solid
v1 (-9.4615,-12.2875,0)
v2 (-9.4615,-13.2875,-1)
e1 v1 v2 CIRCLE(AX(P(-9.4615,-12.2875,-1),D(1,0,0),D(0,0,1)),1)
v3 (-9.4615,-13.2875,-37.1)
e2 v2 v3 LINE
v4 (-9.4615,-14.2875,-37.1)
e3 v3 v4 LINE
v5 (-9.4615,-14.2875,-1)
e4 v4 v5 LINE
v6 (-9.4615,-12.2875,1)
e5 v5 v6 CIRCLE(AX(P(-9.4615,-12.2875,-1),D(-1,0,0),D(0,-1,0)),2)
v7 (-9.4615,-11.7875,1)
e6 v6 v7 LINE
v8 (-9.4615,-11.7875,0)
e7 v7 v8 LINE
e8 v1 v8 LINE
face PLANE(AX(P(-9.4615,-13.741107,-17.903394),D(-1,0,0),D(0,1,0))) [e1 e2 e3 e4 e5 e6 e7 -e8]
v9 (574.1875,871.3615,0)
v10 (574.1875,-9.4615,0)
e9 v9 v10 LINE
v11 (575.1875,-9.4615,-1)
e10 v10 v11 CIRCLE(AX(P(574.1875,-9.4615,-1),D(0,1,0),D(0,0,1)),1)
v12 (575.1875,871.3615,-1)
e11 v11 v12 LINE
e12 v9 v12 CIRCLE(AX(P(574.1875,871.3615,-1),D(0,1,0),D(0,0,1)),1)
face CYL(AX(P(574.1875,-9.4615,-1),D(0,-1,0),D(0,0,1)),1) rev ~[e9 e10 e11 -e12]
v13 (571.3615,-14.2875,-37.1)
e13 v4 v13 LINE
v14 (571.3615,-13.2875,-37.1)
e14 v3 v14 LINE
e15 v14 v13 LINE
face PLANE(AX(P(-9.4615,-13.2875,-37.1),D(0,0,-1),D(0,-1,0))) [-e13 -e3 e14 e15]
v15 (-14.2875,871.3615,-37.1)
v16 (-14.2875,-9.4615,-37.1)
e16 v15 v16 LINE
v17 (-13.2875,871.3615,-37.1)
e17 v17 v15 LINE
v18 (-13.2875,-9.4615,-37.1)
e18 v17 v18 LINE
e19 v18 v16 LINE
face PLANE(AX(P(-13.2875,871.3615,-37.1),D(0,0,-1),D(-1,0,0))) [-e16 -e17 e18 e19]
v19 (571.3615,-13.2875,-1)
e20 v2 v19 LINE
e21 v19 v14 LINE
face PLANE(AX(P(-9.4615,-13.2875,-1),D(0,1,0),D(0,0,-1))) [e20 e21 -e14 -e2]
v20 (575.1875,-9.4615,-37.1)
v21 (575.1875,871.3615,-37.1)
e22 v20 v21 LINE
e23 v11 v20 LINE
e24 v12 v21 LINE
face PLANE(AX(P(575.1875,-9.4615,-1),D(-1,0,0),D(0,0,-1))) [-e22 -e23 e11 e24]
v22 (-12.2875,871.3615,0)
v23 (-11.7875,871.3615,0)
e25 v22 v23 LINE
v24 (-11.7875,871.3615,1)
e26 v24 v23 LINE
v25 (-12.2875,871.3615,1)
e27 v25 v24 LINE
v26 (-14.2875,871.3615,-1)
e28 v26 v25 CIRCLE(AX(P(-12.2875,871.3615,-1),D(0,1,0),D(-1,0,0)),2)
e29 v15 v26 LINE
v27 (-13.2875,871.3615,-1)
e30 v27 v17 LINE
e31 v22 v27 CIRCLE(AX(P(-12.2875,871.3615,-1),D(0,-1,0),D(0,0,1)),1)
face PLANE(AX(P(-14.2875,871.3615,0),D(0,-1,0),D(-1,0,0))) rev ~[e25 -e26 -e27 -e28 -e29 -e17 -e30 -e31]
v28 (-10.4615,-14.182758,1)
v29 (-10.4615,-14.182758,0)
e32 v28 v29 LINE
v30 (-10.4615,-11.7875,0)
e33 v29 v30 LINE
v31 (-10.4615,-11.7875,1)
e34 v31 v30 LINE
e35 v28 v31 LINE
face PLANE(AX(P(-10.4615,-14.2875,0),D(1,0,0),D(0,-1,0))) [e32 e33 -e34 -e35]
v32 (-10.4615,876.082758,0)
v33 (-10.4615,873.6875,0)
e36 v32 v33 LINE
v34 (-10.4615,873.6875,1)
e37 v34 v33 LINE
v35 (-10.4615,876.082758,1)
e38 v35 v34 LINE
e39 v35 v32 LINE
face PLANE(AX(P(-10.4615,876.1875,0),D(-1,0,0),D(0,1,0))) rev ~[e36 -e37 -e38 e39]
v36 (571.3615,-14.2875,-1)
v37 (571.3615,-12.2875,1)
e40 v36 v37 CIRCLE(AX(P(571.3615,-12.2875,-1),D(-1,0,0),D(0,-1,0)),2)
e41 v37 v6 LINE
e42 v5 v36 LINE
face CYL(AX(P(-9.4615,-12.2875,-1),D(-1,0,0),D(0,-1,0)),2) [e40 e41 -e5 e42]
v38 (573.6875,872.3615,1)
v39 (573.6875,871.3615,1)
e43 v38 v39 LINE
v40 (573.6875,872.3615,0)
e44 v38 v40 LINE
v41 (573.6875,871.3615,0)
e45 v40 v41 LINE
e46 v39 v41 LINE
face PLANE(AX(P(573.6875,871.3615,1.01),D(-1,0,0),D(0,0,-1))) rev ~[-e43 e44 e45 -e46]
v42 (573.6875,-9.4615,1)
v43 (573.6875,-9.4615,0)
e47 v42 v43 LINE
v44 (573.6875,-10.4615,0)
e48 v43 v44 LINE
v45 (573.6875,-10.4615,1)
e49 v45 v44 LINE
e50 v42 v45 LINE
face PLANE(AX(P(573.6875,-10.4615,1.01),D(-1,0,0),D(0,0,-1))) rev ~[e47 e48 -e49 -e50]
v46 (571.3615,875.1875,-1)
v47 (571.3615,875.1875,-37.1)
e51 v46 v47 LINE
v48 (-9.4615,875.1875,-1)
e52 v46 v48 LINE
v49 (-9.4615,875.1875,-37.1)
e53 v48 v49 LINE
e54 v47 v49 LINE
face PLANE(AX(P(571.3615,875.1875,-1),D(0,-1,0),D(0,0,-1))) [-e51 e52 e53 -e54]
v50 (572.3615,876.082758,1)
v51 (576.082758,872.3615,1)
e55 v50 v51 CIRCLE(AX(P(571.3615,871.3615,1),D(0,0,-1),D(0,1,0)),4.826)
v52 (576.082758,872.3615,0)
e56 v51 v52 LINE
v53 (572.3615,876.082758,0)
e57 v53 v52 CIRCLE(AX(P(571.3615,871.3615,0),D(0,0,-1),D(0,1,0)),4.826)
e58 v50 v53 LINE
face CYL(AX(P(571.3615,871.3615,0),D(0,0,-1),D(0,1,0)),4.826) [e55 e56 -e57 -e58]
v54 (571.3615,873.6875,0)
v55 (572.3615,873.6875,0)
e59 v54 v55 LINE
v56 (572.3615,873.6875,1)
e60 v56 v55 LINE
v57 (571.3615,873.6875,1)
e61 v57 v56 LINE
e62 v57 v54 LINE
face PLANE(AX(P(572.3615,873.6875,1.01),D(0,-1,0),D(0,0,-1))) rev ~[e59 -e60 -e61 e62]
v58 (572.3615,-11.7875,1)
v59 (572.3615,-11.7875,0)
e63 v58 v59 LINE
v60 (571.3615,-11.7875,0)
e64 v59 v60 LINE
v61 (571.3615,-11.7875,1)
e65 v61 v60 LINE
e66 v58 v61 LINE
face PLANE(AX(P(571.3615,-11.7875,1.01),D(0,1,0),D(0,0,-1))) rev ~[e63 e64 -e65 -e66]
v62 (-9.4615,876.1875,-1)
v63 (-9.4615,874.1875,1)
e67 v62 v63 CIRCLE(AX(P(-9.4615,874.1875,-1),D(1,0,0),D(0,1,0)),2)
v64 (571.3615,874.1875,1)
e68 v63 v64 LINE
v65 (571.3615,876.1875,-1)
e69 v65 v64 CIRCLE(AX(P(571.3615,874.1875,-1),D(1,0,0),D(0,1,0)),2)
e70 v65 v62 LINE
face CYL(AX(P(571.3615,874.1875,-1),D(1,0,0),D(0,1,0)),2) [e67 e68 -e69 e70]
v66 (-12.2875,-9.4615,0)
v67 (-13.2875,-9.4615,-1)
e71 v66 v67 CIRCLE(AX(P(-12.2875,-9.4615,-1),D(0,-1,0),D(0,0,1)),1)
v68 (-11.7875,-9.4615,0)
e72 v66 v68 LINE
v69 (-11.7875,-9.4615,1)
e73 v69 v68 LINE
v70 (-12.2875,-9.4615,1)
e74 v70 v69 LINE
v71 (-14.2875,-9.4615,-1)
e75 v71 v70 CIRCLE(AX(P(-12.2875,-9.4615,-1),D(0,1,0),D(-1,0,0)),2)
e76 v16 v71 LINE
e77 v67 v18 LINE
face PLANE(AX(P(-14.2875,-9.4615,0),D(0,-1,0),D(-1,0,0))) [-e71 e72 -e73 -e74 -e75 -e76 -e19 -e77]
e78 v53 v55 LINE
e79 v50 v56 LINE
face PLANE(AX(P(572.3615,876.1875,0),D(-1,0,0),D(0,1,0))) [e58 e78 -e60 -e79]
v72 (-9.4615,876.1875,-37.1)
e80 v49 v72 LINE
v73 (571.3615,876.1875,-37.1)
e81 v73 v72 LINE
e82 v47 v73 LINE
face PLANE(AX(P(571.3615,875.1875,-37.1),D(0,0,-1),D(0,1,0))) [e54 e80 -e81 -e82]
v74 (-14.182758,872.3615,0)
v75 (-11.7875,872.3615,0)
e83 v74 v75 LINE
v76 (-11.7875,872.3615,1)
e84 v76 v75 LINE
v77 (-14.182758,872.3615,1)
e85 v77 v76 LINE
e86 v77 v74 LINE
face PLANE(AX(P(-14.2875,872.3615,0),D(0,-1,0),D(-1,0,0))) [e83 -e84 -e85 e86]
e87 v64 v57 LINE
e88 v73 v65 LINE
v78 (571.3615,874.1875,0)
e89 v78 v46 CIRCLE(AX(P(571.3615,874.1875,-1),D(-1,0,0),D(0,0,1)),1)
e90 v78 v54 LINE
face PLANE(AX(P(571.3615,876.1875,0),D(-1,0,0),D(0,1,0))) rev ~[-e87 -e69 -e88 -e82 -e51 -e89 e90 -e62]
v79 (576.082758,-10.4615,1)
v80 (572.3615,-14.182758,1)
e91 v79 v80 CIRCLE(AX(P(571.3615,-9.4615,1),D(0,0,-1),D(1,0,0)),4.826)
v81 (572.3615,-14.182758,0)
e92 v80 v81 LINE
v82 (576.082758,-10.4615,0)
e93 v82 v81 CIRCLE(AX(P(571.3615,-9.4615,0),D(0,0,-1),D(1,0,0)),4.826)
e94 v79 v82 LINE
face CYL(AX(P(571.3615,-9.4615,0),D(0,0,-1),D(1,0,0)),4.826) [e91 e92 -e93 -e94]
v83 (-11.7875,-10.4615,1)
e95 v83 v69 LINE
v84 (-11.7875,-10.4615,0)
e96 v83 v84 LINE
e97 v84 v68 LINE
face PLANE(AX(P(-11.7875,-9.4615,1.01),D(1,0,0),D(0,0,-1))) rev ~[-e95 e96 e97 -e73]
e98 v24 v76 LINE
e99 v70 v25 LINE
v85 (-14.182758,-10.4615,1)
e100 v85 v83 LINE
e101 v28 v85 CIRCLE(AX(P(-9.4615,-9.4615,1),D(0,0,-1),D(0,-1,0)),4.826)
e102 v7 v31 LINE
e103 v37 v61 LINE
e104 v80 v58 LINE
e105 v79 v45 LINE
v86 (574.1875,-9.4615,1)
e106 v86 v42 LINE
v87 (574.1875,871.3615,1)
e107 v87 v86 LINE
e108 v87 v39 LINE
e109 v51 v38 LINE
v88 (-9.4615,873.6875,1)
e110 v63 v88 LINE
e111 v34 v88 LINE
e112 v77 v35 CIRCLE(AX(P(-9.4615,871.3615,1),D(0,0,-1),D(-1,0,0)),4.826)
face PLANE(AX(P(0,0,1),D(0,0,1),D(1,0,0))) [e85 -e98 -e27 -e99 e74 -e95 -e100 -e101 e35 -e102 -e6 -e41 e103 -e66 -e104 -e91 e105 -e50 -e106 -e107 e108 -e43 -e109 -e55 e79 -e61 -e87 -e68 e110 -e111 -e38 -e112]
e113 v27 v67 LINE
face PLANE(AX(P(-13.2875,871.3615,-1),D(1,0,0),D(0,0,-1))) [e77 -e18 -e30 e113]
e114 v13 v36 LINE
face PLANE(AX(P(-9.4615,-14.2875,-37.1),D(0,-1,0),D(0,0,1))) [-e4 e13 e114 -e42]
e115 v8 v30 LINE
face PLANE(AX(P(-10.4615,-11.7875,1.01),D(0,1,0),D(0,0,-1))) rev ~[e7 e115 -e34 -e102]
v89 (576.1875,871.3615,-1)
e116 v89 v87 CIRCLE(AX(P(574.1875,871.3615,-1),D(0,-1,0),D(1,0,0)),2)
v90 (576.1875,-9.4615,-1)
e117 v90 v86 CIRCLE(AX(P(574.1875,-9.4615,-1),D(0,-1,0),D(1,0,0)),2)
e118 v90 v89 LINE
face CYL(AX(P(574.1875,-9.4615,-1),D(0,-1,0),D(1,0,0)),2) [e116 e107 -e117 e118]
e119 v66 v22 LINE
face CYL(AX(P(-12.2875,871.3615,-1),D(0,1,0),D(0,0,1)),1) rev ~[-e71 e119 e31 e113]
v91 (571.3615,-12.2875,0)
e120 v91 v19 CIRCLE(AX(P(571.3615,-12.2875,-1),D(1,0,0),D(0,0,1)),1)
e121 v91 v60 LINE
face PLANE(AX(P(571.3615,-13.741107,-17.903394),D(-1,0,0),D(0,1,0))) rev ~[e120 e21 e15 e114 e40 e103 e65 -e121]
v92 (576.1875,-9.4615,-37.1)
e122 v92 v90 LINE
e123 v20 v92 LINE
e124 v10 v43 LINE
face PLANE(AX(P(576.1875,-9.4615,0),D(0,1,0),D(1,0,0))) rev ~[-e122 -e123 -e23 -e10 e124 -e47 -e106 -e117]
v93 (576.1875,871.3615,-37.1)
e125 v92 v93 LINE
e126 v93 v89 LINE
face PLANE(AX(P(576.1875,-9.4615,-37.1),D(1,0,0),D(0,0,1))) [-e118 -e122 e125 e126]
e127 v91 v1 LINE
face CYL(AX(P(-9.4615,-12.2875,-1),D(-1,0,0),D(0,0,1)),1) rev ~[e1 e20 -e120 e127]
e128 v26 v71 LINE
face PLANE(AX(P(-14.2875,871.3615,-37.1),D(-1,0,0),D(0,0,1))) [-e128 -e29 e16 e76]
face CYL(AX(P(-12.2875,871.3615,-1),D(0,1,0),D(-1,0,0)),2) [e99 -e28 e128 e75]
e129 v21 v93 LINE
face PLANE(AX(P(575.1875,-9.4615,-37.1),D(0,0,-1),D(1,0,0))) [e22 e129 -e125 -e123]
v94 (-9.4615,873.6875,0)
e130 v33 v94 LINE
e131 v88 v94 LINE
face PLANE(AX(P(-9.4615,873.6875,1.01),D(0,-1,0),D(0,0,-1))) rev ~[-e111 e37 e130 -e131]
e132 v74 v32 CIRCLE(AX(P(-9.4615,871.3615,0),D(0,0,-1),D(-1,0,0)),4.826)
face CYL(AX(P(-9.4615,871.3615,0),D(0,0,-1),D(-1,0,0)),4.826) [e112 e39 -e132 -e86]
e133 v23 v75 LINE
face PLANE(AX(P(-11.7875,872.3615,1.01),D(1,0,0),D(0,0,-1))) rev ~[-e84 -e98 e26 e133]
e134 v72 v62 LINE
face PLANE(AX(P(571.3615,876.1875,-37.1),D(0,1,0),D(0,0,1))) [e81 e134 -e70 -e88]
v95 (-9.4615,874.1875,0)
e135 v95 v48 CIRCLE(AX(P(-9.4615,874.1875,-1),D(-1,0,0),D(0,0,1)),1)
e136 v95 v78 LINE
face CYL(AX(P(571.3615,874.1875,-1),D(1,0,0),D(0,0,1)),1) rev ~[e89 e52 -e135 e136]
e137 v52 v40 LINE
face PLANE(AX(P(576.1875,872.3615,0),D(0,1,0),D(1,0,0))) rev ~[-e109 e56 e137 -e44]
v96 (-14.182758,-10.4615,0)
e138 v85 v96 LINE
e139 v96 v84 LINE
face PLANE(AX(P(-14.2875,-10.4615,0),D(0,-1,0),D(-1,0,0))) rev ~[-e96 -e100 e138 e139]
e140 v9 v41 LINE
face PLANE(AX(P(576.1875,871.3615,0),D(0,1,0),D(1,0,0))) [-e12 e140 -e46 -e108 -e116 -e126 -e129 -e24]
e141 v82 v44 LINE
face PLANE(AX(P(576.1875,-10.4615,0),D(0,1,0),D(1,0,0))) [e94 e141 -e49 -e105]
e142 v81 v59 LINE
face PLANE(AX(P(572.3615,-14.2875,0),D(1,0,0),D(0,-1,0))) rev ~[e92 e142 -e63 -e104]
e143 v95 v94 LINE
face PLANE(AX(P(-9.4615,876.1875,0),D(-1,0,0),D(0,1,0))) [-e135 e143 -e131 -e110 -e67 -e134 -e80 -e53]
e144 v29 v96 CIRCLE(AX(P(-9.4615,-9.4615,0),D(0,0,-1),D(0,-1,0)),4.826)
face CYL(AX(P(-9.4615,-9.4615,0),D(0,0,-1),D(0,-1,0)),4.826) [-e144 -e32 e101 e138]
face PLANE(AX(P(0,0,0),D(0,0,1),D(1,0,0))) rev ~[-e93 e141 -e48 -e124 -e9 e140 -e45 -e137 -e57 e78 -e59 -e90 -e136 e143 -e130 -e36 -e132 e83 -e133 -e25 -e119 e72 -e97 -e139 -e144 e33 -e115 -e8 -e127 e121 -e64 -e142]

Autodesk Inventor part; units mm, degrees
ref_plane "YZ Plane" through (0, 0, 0) normal (1, 0, 0) x (0, 1, 0)
ref_plane "XZ Plane" through (0, 0, 0) normal (0, 1, 0) x (-1, 0, 0)
ref_plane "XY Plane" through (0, 0, 0) normal (0, 0, 1) x (1, 0, 0)
sketch "Boceto1" plane through (0, 0, 0) normal (0, 0, 1) x (1, 0, 0)
  line L0 (-19.05, -19.05) -> (-19.05, 19.05)
  line L1 (19.05, -19.05) -> (-19.05, -19.05)
  line L2 (-14.2875, 16.764) -> (-14.2875, -9.4615)
  line L3 (-9.4615, -14.2875) -> (16.764, -14.2875)
  arc A0 (-14.2875, -9.4615) -> (-9.4615, -14.2875) centre (-9.4615, -9.4615) ccw
  line L4 (-14.2875, -9.4615) -> (-14.2875, 871.3615)
  line L5 (-9.4615, 876.1875) -> (571.3615, 876.1875)
  line L6 (576.1875, 871.3615) -> (576.1875, -9.4615)
  line L7 (571.3615, -14.2875) -> (-9.4615, -14.2875)
  arc A1 (571.3615, -14.2875) -> (576.1875, -9.4615) centre (571.3615, -9.4615) ccw
  arc A2 (576.1875, 871.3615) -> (571.3615, 876.1875) centre (571.3615, 871.3615) ccw
  arc A3 (-9.4615, 876.1875) -> (-14.2875, 871.3615) centre (-9.4615, 871.3615) ccw
  line L8 (-14.2875, -9.4615) -> (-14.2875, -9.4615)
  arc A4 (-14.2875, -9.4615) -> (-9.4615, -14.2875) centre (-9.4615, -9.4615) ccw
  point P0 (0, 0)
  point P1 (-14.2875, -14.2875)
  point P2 (-14.2875, 876.1875)
  point P3 (576.1875, 876.1875)
  point P4 (576.1875, -14.2875)
  dimension "d3" = 890.475
  dimension "d5" = 890.475
  dimension "d6" = 4.826
  dimension "d7" = 4.826
  dimension "d8" = 4.826
  dimension "d9" = 4.826
sketch "Boceto1 outline for Placa1" plane through (0, 0, 0) normal (0, 0, 1) x (1, 0, 0)
  line L0 (-14.2875, -9.4615) -> (-14.2875, 871.3615)
  arc A0 (-14.2875, 871.3615) -> (-9.4615, 876.1875) centre (-9.4615, 871.3615) cw
  line L1 (-9.4615, 876.1875) -> (571.3615, 876.1875)
  arc A1 (571.3615, 876.1875) -> (576.1875, 871.3615) centre (571.3615, 871.3615) cw
  line L2 (576.1875, 871.3615) -> (576.1875, -9.4615)
  arc A2 (576.1875, -9.4615) -> (571.3615, -14.2875) centre (571.3615, -9.4615) cw
  line L3 (571.3615, -14.2875) -> (-9.4615, -14.2875)
  arc A3 (-9.4615, -14.2875) -> (-14.2875, -9.4615) centre (-9.4615, -9.4615) cw
extrude "Placa1" add sketch "Boceto1 outline for Placa1" along normal blind 1
sketch "Boceto2" plane through (-9.4615, -13.2875, 1) normal (0, -1, 0) x (1, 0, 0)
  line L0 (580.823, 0) -> (0, 0)
  line L1 (0, 0) -> (0, -38.1)
  line L2 (0, -38.1) -> (580.823, -38.1)
  line L3 (580.823, -38.1) -> (580.823, 0)
edge flange "Pestaña1" height 38.1 angle 90 thickness 1 bend radius 1 thickness toward (0, -1, 0) relief straight relief width 1 relief depth 0.5 corner gap 1 corner form 0 edges at (280.95, -14.2875, 0) (-14.2875, 430.95, 0) (280.95, 876.1875, 0) (576.1875, 430.95, 0) wall of the first edge with corners at (571.3615, -13.2875, 1) (-9.4615, -13.2875, 1) (-9.4615, -13.2875, -37.1) (571.3615, -13.2875, -37.1)
bend "Doblez1"
corner "Esquina1"
equation "\"d10\" = Anchura_desahogo_plegado"
equation "\"d11\" = Profundidad_desahogo_plegado"
equation "\"d12\" = Remanente_mínimo"
equation "\"d13\" = Radio_pliegue"
equation "\"d16\" = Radio_pliegue"
equation "\"d17\" = Tamaño_destalonado"
equation "\"d18\" = TamañoSeparación"
equation "\"d19\" = Tamaño_de_radio_de_Jacobi"
equation "\"Radio_pliegue\" = Grosor"
equation "\"Anchura_desahogo_plegado\" = Grosor"
equation "\"Profundidad_desahogo_plegado\" = 0.5 * Grosor"
equation "\"Tamaño_destalonado\" = 4 * Grosor"
equation "\"Remanente_mínimo\" = 2 * Grosor"
equation "\"Radiodetransición\" = Radio_pliegue"
equation "\"Tamaño_de_radio_de_Jacobi\" = Radio_pliegue"
equation "\"TamañoSeparación\" = Grosor"
equation "\"d2\" = Radio_pliegue"
equation "\"Grosor\" = 1"
properties part number "lámina" material "Latón, amarillo claro"
